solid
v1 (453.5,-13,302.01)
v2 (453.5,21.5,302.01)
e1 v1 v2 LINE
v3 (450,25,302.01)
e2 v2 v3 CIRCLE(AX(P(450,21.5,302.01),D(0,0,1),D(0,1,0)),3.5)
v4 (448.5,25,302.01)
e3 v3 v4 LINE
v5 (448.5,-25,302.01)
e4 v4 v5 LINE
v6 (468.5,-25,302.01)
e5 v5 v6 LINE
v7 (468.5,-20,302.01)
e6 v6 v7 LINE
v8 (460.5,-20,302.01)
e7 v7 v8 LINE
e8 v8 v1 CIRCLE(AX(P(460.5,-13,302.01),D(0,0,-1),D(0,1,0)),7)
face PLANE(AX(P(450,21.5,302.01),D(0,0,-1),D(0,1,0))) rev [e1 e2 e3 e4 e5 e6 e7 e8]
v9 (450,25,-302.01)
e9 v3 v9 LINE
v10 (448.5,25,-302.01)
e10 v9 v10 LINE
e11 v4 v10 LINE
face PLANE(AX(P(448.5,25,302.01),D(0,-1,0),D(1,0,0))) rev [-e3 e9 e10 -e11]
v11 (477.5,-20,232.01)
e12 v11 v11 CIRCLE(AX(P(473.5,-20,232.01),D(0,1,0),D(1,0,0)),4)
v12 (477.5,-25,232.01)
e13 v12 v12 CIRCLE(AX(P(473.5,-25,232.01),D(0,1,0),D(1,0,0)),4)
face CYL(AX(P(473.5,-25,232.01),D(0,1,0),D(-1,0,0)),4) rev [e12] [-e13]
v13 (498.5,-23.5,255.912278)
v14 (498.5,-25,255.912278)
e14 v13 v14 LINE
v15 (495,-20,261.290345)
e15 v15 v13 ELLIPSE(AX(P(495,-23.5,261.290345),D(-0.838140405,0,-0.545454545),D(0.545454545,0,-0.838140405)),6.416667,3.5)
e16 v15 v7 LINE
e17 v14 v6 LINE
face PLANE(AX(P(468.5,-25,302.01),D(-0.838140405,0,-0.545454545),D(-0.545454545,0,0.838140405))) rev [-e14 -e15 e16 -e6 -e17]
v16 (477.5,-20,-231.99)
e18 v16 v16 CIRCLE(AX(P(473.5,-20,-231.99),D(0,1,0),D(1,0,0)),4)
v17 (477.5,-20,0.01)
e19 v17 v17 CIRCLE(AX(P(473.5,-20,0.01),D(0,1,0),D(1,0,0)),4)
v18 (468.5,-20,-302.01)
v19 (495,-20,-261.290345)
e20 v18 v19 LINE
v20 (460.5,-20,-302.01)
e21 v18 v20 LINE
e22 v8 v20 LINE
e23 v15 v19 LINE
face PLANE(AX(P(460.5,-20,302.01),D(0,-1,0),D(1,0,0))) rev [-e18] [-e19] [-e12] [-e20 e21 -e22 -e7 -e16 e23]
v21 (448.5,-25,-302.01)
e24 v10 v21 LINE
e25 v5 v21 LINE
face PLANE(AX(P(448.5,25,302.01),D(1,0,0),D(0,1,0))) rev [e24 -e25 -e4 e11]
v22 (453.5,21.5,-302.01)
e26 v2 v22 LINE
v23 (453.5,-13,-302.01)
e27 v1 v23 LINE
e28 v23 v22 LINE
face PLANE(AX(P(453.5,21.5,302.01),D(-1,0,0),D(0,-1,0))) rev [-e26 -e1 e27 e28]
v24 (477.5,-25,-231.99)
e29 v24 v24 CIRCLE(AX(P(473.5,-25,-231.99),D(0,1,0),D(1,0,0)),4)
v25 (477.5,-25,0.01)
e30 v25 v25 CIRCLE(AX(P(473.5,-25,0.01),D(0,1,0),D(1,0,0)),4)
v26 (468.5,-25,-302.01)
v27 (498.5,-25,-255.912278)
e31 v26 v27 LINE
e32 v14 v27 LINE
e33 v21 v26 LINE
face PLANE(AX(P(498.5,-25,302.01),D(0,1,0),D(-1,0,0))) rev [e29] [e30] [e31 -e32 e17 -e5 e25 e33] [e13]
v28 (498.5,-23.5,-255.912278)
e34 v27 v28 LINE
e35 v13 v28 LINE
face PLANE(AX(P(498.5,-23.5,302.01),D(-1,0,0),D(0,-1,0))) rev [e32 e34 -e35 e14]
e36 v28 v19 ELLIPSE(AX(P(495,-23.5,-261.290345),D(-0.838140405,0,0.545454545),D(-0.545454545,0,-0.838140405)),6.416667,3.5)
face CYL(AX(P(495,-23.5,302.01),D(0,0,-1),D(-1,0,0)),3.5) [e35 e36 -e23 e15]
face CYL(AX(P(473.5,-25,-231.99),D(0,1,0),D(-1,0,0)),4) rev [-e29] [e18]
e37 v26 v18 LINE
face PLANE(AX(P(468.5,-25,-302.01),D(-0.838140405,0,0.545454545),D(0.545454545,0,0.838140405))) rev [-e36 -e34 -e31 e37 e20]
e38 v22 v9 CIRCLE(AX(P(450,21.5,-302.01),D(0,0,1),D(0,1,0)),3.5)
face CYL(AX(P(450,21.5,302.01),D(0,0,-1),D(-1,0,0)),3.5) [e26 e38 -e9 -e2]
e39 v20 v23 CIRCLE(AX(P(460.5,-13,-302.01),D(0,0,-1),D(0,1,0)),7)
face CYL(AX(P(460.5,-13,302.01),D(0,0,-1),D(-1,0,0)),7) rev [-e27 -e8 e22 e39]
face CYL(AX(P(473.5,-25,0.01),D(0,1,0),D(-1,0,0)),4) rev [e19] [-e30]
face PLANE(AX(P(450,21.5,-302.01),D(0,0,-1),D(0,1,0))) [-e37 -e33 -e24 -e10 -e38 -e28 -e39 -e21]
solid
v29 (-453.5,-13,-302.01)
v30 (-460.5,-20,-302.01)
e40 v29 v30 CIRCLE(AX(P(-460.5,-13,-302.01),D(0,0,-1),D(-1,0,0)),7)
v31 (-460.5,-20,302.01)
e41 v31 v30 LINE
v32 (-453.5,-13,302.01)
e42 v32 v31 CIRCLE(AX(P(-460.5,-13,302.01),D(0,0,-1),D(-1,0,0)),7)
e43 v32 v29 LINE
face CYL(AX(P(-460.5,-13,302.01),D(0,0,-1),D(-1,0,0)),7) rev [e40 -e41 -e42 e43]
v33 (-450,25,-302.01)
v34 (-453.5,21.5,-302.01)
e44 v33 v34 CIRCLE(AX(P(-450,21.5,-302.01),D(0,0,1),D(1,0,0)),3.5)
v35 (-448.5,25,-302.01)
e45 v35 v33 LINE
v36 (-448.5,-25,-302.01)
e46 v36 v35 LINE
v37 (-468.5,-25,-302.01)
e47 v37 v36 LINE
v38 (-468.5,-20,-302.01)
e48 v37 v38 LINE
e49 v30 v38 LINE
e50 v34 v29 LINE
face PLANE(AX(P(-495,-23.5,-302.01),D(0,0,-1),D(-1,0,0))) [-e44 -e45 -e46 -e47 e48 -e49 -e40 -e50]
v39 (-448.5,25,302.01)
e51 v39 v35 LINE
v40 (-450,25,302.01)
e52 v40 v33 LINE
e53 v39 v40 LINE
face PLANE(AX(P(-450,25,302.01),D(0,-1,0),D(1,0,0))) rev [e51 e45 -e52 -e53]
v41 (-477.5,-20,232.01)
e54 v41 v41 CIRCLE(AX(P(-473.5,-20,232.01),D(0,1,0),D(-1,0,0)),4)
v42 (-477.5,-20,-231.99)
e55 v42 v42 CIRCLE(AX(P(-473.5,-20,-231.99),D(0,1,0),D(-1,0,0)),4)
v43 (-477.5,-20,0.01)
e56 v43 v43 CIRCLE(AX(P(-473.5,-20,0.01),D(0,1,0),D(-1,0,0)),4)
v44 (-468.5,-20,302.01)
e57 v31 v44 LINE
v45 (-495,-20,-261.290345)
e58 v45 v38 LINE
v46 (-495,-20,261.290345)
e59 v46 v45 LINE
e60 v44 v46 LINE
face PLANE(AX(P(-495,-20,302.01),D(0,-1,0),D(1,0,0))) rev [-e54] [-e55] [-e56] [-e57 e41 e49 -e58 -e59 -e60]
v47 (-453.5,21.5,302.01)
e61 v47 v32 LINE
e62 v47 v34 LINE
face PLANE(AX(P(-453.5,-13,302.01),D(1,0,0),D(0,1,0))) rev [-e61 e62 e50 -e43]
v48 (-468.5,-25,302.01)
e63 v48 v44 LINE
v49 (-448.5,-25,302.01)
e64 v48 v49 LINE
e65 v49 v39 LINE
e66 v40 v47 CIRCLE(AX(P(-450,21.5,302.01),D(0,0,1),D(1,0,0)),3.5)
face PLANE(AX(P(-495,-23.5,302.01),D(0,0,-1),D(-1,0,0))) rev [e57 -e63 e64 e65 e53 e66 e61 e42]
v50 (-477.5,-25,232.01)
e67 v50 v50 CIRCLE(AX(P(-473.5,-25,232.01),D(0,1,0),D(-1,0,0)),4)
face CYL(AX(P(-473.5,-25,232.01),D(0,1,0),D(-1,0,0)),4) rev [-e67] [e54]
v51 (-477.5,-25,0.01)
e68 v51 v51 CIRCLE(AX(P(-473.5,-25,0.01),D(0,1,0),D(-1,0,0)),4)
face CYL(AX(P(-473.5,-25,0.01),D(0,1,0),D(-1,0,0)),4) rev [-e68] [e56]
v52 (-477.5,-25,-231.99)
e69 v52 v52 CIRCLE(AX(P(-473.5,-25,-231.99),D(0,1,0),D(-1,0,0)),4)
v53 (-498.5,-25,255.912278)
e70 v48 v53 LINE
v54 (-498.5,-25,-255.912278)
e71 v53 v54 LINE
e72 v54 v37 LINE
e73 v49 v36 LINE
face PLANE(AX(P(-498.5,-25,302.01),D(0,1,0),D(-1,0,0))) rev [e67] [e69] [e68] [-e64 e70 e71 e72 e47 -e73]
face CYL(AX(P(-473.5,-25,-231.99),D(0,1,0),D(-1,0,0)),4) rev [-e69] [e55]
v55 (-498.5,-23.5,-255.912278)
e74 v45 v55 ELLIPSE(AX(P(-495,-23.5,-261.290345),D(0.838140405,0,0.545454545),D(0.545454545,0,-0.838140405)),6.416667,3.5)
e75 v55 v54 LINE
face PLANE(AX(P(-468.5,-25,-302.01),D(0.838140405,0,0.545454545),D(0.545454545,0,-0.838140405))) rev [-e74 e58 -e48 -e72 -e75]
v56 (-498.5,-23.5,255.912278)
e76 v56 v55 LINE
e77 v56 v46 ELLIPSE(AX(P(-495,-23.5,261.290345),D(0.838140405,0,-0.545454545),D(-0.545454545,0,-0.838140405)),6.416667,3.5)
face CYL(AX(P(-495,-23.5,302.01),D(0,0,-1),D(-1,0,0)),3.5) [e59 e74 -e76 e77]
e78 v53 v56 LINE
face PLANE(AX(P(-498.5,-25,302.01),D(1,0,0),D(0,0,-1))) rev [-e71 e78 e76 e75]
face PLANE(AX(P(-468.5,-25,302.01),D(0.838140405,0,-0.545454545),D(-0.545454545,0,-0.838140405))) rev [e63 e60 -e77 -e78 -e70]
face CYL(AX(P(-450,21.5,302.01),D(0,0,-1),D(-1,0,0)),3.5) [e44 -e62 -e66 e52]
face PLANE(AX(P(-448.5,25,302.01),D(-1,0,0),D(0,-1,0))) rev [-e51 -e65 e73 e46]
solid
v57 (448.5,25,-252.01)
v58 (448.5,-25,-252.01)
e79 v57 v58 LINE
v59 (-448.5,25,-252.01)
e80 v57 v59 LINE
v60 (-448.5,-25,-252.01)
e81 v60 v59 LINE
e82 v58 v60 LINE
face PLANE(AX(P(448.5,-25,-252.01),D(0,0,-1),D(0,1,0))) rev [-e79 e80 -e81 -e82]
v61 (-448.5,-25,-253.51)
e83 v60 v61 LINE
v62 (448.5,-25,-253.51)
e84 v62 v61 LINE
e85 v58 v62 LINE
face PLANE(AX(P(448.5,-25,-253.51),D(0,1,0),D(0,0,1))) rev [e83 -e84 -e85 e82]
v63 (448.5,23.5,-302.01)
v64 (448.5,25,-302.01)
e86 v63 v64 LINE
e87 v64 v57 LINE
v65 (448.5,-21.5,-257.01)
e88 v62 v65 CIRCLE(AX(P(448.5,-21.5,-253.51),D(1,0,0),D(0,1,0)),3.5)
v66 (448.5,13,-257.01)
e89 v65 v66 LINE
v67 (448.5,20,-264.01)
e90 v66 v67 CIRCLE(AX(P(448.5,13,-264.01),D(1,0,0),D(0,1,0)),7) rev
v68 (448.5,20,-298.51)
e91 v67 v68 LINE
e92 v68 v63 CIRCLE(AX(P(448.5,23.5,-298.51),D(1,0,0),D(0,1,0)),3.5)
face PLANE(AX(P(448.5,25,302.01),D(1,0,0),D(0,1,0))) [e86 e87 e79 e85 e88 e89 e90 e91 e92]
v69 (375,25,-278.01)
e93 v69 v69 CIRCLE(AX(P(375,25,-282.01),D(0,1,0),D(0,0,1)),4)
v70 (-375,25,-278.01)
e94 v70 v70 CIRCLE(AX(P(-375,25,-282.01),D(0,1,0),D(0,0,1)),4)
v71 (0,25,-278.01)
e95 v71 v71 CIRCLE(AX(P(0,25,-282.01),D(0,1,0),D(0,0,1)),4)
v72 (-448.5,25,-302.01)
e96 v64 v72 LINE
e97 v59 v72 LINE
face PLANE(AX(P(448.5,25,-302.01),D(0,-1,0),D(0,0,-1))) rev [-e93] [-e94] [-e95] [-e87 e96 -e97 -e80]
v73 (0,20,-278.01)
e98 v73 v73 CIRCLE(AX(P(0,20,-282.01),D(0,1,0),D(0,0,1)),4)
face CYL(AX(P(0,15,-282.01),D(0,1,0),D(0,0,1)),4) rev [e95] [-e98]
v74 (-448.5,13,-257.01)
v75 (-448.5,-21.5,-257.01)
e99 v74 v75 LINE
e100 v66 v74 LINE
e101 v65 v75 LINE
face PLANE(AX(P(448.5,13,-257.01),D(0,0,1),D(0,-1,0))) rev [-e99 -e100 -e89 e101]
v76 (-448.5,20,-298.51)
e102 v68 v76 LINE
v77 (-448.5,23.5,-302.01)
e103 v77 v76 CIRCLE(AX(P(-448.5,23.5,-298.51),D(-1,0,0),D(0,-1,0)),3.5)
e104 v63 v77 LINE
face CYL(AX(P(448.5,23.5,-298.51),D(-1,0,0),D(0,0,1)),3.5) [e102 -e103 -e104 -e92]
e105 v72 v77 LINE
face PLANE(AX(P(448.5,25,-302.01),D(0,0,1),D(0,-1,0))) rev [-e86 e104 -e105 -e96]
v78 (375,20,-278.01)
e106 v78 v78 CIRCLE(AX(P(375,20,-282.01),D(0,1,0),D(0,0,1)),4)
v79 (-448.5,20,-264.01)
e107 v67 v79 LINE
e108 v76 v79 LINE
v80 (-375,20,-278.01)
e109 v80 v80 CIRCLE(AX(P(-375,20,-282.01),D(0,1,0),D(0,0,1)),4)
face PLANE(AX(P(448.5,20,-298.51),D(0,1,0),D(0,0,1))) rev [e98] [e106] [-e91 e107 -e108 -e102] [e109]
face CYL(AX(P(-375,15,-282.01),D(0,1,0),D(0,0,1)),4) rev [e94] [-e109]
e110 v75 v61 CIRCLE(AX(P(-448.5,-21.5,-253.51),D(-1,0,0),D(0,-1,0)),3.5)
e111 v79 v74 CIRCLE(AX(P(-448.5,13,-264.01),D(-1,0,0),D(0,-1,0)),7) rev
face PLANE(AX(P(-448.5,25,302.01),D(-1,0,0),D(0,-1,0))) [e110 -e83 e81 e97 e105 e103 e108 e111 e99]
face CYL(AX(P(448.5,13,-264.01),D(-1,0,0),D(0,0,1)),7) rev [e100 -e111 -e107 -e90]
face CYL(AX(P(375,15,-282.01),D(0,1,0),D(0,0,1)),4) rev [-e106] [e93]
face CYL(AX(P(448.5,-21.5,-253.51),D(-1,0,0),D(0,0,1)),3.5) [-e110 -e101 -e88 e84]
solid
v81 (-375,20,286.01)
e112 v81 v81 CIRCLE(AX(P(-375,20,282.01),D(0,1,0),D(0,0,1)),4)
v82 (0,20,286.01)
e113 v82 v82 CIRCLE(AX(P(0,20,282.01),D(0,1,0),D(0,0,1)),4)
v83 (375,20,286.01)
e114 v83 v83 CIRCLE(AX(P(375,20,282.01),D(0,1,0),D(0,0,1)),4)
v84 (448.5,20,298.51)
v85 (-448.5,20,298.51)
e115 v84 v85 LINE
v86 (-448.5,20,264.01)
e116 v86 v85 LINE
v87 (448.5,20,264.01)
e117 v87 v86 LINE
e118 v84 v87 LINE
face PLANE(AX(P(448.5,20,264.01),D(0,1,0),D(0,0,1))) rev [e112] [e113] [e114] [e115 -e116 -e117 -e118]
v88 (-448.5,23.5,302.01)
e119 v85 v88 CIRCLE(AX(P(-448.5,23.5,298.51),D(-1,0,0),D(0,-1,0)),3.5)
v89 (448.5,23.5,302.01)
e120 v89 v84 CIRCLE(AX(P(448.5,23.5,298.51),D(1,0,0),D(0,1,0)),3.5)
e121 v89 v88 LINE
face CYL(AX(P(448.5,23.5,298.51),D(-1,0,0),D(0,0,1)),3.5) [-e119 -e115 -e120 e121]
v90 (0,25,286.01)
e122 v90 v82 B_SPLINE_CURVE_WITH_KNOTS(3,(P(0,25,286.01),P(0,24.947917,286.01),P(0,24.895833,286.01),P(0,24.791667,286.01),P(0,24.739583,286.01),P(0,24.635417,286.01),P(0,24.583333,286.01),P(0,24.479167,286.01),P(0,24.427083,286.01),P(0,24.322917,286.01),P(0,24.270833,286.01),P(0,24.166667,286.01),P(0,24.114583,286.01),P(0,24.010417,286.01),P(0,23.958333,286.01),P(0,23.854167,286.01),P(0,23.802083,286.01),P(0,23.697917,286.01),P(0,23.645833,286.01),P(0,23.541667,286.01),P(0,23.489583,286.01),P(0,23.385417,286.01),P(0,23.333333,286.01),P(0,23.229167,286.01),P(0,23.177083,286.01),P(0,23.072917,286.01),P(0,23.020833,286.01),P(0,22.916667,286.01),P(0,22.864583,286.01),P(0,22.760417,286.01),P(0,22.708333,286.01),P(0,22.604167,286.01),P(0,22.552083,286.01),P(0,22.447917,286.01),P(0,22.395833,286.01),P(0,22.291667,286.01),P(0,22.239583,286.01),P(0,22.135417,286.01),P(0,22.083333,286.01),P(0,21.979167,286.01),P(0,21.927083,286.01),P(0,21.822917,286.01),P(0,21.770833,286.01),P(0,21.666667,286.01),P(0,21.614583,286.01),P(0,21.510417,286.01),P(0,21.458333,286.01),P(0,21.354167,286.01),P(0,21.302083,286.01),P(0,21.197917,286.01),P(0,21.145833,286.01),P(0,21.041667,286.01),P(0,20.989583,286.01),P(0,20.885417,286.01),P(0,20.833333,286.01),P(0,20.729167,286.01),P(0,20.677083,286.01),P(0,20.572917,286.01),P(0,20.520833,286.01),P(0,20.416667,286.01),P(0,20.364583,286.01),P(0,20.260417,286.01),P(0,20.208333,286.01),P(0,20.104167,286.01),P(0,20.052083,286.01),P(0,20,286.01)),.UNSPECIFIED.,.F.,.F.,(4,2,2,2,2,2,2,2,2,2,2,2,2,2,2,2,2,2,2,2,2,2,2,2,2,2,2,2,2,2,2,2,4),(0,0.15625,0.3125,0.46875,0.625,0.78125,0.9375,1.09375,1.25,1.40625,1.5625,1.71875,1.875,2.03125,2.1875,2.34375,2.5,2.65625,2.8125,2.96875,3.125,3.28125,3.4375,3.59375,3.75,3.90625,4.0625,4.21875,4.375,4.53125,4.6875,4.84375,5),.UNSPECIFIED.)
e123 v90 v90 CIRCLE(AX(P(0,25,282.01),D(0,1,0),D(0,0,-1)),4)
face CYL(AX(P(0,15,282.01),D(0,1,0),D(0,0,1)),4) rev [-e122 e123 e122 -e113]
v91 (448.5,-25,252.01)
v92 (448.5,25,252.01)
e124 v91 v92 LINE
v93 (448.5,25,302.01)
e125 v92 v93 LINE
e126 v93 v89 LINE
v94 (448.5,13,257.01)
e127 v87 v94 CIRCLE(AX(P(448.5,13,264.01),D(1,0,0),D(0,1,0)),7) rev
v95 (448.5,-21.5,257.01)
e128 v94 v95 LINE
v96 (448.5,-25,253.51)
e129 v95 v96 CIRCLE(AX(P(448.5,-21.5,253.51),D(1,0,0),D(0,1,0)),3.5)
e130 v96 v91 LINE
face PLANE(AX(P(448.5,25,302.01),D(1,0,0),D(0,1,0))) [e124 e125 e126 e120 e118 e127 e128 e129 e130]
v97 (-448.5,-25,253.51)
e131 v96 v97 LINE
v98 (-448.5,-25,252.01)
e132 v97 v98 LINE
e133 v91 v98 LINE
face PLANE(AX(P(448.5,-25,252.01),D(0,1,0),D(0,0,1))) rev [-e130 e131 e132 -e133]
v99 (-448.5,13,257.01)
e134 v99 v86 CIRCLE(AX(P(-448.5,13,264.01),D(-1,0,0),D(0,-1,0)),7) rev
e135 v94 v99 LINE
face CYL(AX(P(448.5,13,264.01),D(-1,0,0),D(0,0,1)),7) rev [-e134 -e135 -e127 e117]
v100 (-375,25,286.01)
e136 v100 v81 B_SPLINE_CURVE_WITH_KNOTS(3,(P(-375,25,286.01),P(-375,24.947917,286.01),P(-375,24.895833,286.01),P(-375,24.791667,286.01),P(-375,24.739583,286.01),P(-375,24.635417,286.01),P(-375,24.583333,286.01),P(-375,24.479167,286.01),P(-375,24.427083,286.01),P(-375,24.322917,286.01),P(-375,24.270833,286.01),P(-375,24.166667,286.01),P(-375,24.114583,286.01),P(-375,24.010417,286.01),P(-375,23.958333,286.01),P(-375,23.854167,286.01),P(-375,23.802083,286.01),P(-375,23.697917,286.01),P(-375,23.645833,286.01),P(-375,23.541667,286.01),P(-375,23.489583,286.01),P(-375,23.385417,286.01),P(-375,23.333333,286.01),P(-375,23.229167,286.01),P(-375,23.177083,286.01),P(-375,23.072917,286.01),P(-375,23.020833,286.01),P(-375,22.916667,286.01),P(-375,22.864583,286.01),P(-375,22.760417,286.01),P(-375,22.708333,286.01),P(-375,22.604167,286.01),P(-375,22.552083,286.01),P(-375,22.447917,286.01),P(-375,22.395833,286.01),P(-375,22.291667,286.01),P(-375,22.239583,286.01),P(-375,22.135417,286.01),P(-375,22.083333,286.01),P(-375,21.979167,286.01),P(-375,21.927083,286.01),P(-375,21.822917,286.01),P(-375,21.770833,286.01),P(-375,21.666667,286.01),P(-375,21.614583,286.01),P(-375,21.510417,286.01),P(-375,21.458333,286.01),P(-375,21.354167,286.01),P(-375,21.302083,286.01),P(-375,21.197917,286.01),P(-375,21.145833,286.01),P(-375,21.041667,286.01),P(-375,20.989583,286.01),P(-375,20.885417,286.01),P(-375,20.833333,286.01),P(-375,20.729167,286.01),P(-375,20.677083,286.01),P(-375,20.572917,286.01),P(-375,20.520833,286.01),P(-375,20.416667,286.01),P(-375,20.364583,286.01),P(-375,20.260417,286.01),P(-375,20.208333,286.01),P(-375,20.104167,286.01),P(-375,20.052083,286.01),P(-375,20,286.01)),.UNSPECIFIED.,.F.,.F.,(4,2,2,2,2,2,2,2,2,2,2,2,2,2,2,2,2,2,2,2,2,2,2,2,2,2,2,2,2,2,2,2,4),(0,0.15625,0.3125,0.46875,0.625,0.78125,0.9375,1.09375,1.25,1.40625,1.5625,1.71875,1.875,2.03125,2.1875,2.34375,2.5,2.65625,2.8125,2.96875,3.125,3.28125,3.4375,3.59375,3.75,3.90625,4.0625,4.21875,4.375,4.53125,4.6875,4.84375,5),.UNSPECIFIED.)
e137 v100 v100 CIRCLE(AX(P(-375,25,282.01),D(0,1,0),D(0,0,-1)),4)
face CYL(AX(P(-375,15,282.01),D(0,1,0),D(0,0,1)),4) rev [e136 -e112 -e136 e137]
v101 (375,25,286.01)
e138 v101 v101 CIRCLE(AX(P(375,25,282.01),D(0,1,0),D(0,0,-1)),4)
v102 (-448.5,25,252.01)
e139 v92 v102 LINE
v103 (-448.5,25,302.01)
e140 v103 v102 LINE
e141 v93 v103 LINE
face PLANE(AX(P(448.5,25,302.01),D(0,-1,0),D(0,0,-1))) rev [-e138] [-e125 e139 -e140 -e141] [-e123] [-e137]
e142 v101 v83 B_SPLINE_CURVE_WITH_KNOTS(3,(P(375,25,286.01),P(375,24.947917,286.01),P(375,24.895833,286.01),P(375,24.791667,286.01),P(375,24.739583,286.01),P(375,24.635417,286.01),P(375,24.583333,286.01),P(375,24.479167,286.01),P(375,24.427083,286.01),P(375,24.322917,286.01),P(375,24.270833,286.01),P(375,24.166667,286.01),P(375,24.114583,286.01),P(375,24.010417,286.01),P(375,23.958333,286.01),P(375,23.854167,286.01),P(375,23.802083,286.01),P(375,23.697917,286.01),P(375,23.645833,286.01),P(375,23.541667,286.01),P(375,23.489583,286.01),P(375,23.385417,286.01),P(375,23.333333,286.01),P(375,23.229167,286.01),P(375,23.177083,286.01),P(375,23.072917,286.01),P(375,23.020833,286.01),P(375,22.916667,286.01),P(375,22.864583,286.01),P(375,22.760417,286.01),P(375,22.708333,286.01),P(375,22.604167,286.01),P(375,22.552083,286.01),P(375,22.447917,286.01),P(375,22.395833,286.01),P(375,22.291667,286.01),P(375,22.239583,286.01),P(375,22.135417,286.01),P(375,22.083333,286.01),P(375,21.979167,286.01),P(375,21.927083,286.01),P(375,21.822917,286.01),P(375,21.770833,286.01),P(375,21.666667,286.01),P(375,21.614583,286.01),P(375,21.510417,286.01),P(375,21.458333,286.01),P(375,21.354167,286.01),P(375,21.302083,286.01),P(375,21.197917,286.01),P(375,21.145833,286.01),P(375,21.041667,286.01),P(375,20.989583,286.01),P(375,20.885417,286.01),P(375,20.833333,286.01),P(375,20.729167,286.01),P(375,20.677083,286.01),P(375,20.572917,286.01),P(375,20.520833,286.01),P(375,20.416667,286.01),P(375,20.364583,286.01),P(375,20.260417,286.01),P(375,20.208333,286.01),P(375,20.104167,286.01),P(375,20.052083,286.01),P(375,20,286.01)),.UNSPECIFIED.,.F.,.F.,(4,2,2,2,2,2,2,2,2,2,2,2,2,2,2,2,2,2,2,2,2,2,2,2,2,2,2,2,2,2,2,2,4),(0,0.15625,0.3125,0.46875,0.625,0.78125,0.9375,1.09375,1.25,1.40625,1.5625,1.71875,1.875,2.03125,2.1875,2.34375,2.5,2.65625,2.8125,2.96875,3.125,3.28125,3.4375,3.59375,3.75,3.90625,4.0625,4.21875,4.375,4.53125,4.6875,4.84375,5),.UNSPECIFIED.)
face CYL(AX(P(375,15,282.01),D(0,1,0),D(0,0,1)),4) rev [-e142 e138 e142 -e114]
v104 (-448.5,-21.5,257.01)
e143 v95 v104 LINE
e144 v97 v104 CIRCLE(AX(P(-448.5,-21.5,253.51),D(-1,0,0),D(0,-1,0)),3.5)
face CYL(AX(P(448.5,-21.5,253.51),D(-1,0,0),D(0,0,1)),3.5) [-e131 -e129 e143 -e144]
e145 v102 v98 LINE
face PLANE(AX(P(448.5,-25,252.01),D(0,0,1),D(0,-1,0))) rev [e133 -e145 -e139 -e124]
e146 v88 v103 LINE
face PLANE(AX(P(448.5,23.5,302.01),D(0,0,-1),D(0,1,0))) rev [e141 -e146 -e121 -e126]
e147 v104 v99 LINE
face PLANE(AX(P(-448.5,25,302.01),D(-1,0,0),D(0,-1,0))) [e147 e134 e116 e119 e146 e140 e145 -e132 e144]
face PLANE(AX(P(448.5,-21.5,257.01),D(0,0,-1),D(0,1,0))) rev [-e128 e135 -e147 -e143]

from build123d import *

# Parameters (mm, degrees)
L_START                    = -448.5
L_ANGLE_L50X50X5_1_DEPTH   = 897
L_START_2                  = -302.01
L_ANGLE_L50X50X5_1_2_DEPTH = 604.02
CUT_EXTRUDE1_DEPTH         = 585.583005312
SKETCH13_R                 = 4
CUT_EXTRUDE2_DEPTH         = 585.583005312
SKETCH14_R                 = 4
CUT_EXTRUDE3_DEPTH         = 10


# Read off the part's stored shape, not the designer's step: L angle L50X50X5(1)
with BuildPart() as part:
    # L angle L50X50X5(1) outline → L angle L50X50X5(1) (new body)
    with BuildSketch(Plane.YZ.offset(L_START)):
        with BuildLine():
            Line((25, 252.01), (25, 302.01))
            Line((25, 302.01), (23.5, 302.01))
            ThreePointArc((23.5, 302.01), (21.025126266, 300.984873734), (20, 298.51))
            Line((20, 298.51), (20, 264.01))
            ThreePointArc((20, 264.01), (17.949747468, 259.060252532), (13, 257.01))
            Line((13, 257.01), (-21.5, 257.01))
            ThreePointArc((-21.5, 257.01), (-23.974873734, 255.984873734), (-25, 253.51))
            Line((-25, 253.51), (-25, 252.01))
            Line((-25, 252.01), (25, 252.01))
        make_face()
        with BuildLine():
            Line((25, -252.01), (-25, -252.01))
            Line((-25, -252.01), (-25, -253.51))
            ThreePointArc((-25, -253.51), (-23.974873734, -255.984873734), (-21.5, -257.01))
            Line((-21.5, -257.01), (13, -257.01))
            ThreePointArc((13, -257.01), (17.949747468, -259.060252532), (20, -264.01))
            Line((20, -264.01), (20, -298.51))
            ThreePointArc((20, -298.51), (21.025126266, -300.984873734), (23.5, -302.01))
            Line((23.5, -302.01), (25, -302.01))
            Line((25, -302.01), (25, -252.01))
        make_face()
    extrude(amount=L_ANGLE_L50X50X5_1_DEPTH)

    # Sketch14 → Cut-Extrude3 (cut)
    with BuildSketch(Plane(origin=(0, 25, 0), x_dir=(1, 0, 0), z_dir=(0, 1, 0))):
        with Locations(Location((375, 282.01, 0), (0, 0, 270))):
            Circle(SKETCH14_R)
        with Locations(Location((0, 282.01, 0), (0, 0, 270))):
            Circle(SKETCH14_R)
        with Locations(Location((-375, 282.01, 0), (0, 0, 270))):
            Circle(SKETCH14_R)
        with Locations(Location((-375, -282.01, 0), (0, 0, 270))):
            Circle(SKETCH14_R)
        with Locations(Location((0, -282.01, 0), (0, 0, 270))):
            Circle(SKETCH14_R)
        with Locations(Location((375, -282.01, 0), (0, 0, 270))):
            Circle(SKETCH14_R)
    extrude(amount=-CUT_EXTRUDE3_DEPTH, mode=Mode.SUBTRACT)


with BuildPart() as body_2:
    # L angle L50X50X5_1 2 outline → L angle L50X50X5_1 2 (new body)
    with BuildSketch(Plane.XY.offset(L_START_2)):
        with BuildLine():
            Line((448.5, -25), (498.5, -25))
            Line((498.5, -25), (498.5, -23.5))
            ThreePointArc((498.5, -23.5), (497.474873734, -21.025126266), (495, -20))
            Line((495, -20), (460.5, -20))
            ThreePointArc((460.5, -20), (455.550252532, -17.949747468), (453.5, -13))
            Line((453.5, -13), (453.5, 21.5))
            ThreePointArc((453.5, 21.5), (452.474873734, 23.974873734), (450, 25))
            Line((450, 25), (448.5, 25))
            Line((448.5, 25), (448.5, -25))
        make_face()
        with BuildLine():
            Line((-448.5, -25), (-448.5, 25))
            Line((-448.5, 25), (-450, 25))
            ThreePointArc((-450, 25), (-452.474873734, 23.974873734), (-453.5, 21.5))
            Line((-453.5, 21.5), (-453.5, -13))
            ThreePointArc((-453.5, -13), (-455.550252532, -17.949747468), (-460.5, -20))
            Line((-460.5, -20), (-495, -20))
            ThreePointArc((-495, -20), (-497.474873734, -21.025126266), (-498.5, -23.5))
            Line((-498.5, -23.5), (-498.5, -25))
            Line((-498.5, -25), (-448.5, -25))
        make_face()
    extrude(amount=L_ANGLE_L50X50X5_1_2_DEPTH)

    # Sketch12 → Cut-Extrude1 (cut, through all)
    with BuildSketch(Plane(origin=(0, -20, 0), x_dir=(1, 0, 0), z_dir=(0, 1, 0))):
        Polygon((-468.5, -302.01), (-500.831260031, -252.33008513), (-500.831260031, -302.01), align=None)
        Polygon((-500.831260031, 302.01), (-500.831260031, 252.33008513), (-468.5, 302.01), align=None)
        Polygon((468.5, 302.01), (500.831260031, 252.33008513), (500.831260031, 302.01), align=None)
        Polygon((500.831260031, -302.01), (500.831260031, -252.33008513), (468.5, -302.01), align=None)
    extrude(amount=-CUT_EXTRUDE1_DEPTH, mode=Mode.SUBTRACT)

    # Sketch13 → Cut-Extrude2 (cut, through all)
    with BuildSketch(Plane(origin=(0, -20, 0), x_dir=(1, 0, 0), z_dir=(0, 1, 0))):
        with Locations(Location((-473.5, -232.01, 0), (0, 0, 180))):
            Circle(SKETCH13_R)
        with Locations(Location((-473.5, -0.01, 0), (0, 0, 180))):
            Circle(SKETCH13_R)
        with Locations(Location((-473.5, 231.99, 0), (0, 0, 180))):
            Circle(SKETCH13_R)
        with Locations((473.5, 231.99)):
            Circle(SKETCH13_R)
        with Locations((473.5, -0.01)):
            Circle(SKETCH13_R)
        with Locations((473.5, -232.01)):
            Circle(SKETCH13_R)
    extrude(amount=-CUT_EXTRUDE2_DEPTH, mode=Mode.SUBTRACT)


solid = Compound([part.part, body_2.part])
